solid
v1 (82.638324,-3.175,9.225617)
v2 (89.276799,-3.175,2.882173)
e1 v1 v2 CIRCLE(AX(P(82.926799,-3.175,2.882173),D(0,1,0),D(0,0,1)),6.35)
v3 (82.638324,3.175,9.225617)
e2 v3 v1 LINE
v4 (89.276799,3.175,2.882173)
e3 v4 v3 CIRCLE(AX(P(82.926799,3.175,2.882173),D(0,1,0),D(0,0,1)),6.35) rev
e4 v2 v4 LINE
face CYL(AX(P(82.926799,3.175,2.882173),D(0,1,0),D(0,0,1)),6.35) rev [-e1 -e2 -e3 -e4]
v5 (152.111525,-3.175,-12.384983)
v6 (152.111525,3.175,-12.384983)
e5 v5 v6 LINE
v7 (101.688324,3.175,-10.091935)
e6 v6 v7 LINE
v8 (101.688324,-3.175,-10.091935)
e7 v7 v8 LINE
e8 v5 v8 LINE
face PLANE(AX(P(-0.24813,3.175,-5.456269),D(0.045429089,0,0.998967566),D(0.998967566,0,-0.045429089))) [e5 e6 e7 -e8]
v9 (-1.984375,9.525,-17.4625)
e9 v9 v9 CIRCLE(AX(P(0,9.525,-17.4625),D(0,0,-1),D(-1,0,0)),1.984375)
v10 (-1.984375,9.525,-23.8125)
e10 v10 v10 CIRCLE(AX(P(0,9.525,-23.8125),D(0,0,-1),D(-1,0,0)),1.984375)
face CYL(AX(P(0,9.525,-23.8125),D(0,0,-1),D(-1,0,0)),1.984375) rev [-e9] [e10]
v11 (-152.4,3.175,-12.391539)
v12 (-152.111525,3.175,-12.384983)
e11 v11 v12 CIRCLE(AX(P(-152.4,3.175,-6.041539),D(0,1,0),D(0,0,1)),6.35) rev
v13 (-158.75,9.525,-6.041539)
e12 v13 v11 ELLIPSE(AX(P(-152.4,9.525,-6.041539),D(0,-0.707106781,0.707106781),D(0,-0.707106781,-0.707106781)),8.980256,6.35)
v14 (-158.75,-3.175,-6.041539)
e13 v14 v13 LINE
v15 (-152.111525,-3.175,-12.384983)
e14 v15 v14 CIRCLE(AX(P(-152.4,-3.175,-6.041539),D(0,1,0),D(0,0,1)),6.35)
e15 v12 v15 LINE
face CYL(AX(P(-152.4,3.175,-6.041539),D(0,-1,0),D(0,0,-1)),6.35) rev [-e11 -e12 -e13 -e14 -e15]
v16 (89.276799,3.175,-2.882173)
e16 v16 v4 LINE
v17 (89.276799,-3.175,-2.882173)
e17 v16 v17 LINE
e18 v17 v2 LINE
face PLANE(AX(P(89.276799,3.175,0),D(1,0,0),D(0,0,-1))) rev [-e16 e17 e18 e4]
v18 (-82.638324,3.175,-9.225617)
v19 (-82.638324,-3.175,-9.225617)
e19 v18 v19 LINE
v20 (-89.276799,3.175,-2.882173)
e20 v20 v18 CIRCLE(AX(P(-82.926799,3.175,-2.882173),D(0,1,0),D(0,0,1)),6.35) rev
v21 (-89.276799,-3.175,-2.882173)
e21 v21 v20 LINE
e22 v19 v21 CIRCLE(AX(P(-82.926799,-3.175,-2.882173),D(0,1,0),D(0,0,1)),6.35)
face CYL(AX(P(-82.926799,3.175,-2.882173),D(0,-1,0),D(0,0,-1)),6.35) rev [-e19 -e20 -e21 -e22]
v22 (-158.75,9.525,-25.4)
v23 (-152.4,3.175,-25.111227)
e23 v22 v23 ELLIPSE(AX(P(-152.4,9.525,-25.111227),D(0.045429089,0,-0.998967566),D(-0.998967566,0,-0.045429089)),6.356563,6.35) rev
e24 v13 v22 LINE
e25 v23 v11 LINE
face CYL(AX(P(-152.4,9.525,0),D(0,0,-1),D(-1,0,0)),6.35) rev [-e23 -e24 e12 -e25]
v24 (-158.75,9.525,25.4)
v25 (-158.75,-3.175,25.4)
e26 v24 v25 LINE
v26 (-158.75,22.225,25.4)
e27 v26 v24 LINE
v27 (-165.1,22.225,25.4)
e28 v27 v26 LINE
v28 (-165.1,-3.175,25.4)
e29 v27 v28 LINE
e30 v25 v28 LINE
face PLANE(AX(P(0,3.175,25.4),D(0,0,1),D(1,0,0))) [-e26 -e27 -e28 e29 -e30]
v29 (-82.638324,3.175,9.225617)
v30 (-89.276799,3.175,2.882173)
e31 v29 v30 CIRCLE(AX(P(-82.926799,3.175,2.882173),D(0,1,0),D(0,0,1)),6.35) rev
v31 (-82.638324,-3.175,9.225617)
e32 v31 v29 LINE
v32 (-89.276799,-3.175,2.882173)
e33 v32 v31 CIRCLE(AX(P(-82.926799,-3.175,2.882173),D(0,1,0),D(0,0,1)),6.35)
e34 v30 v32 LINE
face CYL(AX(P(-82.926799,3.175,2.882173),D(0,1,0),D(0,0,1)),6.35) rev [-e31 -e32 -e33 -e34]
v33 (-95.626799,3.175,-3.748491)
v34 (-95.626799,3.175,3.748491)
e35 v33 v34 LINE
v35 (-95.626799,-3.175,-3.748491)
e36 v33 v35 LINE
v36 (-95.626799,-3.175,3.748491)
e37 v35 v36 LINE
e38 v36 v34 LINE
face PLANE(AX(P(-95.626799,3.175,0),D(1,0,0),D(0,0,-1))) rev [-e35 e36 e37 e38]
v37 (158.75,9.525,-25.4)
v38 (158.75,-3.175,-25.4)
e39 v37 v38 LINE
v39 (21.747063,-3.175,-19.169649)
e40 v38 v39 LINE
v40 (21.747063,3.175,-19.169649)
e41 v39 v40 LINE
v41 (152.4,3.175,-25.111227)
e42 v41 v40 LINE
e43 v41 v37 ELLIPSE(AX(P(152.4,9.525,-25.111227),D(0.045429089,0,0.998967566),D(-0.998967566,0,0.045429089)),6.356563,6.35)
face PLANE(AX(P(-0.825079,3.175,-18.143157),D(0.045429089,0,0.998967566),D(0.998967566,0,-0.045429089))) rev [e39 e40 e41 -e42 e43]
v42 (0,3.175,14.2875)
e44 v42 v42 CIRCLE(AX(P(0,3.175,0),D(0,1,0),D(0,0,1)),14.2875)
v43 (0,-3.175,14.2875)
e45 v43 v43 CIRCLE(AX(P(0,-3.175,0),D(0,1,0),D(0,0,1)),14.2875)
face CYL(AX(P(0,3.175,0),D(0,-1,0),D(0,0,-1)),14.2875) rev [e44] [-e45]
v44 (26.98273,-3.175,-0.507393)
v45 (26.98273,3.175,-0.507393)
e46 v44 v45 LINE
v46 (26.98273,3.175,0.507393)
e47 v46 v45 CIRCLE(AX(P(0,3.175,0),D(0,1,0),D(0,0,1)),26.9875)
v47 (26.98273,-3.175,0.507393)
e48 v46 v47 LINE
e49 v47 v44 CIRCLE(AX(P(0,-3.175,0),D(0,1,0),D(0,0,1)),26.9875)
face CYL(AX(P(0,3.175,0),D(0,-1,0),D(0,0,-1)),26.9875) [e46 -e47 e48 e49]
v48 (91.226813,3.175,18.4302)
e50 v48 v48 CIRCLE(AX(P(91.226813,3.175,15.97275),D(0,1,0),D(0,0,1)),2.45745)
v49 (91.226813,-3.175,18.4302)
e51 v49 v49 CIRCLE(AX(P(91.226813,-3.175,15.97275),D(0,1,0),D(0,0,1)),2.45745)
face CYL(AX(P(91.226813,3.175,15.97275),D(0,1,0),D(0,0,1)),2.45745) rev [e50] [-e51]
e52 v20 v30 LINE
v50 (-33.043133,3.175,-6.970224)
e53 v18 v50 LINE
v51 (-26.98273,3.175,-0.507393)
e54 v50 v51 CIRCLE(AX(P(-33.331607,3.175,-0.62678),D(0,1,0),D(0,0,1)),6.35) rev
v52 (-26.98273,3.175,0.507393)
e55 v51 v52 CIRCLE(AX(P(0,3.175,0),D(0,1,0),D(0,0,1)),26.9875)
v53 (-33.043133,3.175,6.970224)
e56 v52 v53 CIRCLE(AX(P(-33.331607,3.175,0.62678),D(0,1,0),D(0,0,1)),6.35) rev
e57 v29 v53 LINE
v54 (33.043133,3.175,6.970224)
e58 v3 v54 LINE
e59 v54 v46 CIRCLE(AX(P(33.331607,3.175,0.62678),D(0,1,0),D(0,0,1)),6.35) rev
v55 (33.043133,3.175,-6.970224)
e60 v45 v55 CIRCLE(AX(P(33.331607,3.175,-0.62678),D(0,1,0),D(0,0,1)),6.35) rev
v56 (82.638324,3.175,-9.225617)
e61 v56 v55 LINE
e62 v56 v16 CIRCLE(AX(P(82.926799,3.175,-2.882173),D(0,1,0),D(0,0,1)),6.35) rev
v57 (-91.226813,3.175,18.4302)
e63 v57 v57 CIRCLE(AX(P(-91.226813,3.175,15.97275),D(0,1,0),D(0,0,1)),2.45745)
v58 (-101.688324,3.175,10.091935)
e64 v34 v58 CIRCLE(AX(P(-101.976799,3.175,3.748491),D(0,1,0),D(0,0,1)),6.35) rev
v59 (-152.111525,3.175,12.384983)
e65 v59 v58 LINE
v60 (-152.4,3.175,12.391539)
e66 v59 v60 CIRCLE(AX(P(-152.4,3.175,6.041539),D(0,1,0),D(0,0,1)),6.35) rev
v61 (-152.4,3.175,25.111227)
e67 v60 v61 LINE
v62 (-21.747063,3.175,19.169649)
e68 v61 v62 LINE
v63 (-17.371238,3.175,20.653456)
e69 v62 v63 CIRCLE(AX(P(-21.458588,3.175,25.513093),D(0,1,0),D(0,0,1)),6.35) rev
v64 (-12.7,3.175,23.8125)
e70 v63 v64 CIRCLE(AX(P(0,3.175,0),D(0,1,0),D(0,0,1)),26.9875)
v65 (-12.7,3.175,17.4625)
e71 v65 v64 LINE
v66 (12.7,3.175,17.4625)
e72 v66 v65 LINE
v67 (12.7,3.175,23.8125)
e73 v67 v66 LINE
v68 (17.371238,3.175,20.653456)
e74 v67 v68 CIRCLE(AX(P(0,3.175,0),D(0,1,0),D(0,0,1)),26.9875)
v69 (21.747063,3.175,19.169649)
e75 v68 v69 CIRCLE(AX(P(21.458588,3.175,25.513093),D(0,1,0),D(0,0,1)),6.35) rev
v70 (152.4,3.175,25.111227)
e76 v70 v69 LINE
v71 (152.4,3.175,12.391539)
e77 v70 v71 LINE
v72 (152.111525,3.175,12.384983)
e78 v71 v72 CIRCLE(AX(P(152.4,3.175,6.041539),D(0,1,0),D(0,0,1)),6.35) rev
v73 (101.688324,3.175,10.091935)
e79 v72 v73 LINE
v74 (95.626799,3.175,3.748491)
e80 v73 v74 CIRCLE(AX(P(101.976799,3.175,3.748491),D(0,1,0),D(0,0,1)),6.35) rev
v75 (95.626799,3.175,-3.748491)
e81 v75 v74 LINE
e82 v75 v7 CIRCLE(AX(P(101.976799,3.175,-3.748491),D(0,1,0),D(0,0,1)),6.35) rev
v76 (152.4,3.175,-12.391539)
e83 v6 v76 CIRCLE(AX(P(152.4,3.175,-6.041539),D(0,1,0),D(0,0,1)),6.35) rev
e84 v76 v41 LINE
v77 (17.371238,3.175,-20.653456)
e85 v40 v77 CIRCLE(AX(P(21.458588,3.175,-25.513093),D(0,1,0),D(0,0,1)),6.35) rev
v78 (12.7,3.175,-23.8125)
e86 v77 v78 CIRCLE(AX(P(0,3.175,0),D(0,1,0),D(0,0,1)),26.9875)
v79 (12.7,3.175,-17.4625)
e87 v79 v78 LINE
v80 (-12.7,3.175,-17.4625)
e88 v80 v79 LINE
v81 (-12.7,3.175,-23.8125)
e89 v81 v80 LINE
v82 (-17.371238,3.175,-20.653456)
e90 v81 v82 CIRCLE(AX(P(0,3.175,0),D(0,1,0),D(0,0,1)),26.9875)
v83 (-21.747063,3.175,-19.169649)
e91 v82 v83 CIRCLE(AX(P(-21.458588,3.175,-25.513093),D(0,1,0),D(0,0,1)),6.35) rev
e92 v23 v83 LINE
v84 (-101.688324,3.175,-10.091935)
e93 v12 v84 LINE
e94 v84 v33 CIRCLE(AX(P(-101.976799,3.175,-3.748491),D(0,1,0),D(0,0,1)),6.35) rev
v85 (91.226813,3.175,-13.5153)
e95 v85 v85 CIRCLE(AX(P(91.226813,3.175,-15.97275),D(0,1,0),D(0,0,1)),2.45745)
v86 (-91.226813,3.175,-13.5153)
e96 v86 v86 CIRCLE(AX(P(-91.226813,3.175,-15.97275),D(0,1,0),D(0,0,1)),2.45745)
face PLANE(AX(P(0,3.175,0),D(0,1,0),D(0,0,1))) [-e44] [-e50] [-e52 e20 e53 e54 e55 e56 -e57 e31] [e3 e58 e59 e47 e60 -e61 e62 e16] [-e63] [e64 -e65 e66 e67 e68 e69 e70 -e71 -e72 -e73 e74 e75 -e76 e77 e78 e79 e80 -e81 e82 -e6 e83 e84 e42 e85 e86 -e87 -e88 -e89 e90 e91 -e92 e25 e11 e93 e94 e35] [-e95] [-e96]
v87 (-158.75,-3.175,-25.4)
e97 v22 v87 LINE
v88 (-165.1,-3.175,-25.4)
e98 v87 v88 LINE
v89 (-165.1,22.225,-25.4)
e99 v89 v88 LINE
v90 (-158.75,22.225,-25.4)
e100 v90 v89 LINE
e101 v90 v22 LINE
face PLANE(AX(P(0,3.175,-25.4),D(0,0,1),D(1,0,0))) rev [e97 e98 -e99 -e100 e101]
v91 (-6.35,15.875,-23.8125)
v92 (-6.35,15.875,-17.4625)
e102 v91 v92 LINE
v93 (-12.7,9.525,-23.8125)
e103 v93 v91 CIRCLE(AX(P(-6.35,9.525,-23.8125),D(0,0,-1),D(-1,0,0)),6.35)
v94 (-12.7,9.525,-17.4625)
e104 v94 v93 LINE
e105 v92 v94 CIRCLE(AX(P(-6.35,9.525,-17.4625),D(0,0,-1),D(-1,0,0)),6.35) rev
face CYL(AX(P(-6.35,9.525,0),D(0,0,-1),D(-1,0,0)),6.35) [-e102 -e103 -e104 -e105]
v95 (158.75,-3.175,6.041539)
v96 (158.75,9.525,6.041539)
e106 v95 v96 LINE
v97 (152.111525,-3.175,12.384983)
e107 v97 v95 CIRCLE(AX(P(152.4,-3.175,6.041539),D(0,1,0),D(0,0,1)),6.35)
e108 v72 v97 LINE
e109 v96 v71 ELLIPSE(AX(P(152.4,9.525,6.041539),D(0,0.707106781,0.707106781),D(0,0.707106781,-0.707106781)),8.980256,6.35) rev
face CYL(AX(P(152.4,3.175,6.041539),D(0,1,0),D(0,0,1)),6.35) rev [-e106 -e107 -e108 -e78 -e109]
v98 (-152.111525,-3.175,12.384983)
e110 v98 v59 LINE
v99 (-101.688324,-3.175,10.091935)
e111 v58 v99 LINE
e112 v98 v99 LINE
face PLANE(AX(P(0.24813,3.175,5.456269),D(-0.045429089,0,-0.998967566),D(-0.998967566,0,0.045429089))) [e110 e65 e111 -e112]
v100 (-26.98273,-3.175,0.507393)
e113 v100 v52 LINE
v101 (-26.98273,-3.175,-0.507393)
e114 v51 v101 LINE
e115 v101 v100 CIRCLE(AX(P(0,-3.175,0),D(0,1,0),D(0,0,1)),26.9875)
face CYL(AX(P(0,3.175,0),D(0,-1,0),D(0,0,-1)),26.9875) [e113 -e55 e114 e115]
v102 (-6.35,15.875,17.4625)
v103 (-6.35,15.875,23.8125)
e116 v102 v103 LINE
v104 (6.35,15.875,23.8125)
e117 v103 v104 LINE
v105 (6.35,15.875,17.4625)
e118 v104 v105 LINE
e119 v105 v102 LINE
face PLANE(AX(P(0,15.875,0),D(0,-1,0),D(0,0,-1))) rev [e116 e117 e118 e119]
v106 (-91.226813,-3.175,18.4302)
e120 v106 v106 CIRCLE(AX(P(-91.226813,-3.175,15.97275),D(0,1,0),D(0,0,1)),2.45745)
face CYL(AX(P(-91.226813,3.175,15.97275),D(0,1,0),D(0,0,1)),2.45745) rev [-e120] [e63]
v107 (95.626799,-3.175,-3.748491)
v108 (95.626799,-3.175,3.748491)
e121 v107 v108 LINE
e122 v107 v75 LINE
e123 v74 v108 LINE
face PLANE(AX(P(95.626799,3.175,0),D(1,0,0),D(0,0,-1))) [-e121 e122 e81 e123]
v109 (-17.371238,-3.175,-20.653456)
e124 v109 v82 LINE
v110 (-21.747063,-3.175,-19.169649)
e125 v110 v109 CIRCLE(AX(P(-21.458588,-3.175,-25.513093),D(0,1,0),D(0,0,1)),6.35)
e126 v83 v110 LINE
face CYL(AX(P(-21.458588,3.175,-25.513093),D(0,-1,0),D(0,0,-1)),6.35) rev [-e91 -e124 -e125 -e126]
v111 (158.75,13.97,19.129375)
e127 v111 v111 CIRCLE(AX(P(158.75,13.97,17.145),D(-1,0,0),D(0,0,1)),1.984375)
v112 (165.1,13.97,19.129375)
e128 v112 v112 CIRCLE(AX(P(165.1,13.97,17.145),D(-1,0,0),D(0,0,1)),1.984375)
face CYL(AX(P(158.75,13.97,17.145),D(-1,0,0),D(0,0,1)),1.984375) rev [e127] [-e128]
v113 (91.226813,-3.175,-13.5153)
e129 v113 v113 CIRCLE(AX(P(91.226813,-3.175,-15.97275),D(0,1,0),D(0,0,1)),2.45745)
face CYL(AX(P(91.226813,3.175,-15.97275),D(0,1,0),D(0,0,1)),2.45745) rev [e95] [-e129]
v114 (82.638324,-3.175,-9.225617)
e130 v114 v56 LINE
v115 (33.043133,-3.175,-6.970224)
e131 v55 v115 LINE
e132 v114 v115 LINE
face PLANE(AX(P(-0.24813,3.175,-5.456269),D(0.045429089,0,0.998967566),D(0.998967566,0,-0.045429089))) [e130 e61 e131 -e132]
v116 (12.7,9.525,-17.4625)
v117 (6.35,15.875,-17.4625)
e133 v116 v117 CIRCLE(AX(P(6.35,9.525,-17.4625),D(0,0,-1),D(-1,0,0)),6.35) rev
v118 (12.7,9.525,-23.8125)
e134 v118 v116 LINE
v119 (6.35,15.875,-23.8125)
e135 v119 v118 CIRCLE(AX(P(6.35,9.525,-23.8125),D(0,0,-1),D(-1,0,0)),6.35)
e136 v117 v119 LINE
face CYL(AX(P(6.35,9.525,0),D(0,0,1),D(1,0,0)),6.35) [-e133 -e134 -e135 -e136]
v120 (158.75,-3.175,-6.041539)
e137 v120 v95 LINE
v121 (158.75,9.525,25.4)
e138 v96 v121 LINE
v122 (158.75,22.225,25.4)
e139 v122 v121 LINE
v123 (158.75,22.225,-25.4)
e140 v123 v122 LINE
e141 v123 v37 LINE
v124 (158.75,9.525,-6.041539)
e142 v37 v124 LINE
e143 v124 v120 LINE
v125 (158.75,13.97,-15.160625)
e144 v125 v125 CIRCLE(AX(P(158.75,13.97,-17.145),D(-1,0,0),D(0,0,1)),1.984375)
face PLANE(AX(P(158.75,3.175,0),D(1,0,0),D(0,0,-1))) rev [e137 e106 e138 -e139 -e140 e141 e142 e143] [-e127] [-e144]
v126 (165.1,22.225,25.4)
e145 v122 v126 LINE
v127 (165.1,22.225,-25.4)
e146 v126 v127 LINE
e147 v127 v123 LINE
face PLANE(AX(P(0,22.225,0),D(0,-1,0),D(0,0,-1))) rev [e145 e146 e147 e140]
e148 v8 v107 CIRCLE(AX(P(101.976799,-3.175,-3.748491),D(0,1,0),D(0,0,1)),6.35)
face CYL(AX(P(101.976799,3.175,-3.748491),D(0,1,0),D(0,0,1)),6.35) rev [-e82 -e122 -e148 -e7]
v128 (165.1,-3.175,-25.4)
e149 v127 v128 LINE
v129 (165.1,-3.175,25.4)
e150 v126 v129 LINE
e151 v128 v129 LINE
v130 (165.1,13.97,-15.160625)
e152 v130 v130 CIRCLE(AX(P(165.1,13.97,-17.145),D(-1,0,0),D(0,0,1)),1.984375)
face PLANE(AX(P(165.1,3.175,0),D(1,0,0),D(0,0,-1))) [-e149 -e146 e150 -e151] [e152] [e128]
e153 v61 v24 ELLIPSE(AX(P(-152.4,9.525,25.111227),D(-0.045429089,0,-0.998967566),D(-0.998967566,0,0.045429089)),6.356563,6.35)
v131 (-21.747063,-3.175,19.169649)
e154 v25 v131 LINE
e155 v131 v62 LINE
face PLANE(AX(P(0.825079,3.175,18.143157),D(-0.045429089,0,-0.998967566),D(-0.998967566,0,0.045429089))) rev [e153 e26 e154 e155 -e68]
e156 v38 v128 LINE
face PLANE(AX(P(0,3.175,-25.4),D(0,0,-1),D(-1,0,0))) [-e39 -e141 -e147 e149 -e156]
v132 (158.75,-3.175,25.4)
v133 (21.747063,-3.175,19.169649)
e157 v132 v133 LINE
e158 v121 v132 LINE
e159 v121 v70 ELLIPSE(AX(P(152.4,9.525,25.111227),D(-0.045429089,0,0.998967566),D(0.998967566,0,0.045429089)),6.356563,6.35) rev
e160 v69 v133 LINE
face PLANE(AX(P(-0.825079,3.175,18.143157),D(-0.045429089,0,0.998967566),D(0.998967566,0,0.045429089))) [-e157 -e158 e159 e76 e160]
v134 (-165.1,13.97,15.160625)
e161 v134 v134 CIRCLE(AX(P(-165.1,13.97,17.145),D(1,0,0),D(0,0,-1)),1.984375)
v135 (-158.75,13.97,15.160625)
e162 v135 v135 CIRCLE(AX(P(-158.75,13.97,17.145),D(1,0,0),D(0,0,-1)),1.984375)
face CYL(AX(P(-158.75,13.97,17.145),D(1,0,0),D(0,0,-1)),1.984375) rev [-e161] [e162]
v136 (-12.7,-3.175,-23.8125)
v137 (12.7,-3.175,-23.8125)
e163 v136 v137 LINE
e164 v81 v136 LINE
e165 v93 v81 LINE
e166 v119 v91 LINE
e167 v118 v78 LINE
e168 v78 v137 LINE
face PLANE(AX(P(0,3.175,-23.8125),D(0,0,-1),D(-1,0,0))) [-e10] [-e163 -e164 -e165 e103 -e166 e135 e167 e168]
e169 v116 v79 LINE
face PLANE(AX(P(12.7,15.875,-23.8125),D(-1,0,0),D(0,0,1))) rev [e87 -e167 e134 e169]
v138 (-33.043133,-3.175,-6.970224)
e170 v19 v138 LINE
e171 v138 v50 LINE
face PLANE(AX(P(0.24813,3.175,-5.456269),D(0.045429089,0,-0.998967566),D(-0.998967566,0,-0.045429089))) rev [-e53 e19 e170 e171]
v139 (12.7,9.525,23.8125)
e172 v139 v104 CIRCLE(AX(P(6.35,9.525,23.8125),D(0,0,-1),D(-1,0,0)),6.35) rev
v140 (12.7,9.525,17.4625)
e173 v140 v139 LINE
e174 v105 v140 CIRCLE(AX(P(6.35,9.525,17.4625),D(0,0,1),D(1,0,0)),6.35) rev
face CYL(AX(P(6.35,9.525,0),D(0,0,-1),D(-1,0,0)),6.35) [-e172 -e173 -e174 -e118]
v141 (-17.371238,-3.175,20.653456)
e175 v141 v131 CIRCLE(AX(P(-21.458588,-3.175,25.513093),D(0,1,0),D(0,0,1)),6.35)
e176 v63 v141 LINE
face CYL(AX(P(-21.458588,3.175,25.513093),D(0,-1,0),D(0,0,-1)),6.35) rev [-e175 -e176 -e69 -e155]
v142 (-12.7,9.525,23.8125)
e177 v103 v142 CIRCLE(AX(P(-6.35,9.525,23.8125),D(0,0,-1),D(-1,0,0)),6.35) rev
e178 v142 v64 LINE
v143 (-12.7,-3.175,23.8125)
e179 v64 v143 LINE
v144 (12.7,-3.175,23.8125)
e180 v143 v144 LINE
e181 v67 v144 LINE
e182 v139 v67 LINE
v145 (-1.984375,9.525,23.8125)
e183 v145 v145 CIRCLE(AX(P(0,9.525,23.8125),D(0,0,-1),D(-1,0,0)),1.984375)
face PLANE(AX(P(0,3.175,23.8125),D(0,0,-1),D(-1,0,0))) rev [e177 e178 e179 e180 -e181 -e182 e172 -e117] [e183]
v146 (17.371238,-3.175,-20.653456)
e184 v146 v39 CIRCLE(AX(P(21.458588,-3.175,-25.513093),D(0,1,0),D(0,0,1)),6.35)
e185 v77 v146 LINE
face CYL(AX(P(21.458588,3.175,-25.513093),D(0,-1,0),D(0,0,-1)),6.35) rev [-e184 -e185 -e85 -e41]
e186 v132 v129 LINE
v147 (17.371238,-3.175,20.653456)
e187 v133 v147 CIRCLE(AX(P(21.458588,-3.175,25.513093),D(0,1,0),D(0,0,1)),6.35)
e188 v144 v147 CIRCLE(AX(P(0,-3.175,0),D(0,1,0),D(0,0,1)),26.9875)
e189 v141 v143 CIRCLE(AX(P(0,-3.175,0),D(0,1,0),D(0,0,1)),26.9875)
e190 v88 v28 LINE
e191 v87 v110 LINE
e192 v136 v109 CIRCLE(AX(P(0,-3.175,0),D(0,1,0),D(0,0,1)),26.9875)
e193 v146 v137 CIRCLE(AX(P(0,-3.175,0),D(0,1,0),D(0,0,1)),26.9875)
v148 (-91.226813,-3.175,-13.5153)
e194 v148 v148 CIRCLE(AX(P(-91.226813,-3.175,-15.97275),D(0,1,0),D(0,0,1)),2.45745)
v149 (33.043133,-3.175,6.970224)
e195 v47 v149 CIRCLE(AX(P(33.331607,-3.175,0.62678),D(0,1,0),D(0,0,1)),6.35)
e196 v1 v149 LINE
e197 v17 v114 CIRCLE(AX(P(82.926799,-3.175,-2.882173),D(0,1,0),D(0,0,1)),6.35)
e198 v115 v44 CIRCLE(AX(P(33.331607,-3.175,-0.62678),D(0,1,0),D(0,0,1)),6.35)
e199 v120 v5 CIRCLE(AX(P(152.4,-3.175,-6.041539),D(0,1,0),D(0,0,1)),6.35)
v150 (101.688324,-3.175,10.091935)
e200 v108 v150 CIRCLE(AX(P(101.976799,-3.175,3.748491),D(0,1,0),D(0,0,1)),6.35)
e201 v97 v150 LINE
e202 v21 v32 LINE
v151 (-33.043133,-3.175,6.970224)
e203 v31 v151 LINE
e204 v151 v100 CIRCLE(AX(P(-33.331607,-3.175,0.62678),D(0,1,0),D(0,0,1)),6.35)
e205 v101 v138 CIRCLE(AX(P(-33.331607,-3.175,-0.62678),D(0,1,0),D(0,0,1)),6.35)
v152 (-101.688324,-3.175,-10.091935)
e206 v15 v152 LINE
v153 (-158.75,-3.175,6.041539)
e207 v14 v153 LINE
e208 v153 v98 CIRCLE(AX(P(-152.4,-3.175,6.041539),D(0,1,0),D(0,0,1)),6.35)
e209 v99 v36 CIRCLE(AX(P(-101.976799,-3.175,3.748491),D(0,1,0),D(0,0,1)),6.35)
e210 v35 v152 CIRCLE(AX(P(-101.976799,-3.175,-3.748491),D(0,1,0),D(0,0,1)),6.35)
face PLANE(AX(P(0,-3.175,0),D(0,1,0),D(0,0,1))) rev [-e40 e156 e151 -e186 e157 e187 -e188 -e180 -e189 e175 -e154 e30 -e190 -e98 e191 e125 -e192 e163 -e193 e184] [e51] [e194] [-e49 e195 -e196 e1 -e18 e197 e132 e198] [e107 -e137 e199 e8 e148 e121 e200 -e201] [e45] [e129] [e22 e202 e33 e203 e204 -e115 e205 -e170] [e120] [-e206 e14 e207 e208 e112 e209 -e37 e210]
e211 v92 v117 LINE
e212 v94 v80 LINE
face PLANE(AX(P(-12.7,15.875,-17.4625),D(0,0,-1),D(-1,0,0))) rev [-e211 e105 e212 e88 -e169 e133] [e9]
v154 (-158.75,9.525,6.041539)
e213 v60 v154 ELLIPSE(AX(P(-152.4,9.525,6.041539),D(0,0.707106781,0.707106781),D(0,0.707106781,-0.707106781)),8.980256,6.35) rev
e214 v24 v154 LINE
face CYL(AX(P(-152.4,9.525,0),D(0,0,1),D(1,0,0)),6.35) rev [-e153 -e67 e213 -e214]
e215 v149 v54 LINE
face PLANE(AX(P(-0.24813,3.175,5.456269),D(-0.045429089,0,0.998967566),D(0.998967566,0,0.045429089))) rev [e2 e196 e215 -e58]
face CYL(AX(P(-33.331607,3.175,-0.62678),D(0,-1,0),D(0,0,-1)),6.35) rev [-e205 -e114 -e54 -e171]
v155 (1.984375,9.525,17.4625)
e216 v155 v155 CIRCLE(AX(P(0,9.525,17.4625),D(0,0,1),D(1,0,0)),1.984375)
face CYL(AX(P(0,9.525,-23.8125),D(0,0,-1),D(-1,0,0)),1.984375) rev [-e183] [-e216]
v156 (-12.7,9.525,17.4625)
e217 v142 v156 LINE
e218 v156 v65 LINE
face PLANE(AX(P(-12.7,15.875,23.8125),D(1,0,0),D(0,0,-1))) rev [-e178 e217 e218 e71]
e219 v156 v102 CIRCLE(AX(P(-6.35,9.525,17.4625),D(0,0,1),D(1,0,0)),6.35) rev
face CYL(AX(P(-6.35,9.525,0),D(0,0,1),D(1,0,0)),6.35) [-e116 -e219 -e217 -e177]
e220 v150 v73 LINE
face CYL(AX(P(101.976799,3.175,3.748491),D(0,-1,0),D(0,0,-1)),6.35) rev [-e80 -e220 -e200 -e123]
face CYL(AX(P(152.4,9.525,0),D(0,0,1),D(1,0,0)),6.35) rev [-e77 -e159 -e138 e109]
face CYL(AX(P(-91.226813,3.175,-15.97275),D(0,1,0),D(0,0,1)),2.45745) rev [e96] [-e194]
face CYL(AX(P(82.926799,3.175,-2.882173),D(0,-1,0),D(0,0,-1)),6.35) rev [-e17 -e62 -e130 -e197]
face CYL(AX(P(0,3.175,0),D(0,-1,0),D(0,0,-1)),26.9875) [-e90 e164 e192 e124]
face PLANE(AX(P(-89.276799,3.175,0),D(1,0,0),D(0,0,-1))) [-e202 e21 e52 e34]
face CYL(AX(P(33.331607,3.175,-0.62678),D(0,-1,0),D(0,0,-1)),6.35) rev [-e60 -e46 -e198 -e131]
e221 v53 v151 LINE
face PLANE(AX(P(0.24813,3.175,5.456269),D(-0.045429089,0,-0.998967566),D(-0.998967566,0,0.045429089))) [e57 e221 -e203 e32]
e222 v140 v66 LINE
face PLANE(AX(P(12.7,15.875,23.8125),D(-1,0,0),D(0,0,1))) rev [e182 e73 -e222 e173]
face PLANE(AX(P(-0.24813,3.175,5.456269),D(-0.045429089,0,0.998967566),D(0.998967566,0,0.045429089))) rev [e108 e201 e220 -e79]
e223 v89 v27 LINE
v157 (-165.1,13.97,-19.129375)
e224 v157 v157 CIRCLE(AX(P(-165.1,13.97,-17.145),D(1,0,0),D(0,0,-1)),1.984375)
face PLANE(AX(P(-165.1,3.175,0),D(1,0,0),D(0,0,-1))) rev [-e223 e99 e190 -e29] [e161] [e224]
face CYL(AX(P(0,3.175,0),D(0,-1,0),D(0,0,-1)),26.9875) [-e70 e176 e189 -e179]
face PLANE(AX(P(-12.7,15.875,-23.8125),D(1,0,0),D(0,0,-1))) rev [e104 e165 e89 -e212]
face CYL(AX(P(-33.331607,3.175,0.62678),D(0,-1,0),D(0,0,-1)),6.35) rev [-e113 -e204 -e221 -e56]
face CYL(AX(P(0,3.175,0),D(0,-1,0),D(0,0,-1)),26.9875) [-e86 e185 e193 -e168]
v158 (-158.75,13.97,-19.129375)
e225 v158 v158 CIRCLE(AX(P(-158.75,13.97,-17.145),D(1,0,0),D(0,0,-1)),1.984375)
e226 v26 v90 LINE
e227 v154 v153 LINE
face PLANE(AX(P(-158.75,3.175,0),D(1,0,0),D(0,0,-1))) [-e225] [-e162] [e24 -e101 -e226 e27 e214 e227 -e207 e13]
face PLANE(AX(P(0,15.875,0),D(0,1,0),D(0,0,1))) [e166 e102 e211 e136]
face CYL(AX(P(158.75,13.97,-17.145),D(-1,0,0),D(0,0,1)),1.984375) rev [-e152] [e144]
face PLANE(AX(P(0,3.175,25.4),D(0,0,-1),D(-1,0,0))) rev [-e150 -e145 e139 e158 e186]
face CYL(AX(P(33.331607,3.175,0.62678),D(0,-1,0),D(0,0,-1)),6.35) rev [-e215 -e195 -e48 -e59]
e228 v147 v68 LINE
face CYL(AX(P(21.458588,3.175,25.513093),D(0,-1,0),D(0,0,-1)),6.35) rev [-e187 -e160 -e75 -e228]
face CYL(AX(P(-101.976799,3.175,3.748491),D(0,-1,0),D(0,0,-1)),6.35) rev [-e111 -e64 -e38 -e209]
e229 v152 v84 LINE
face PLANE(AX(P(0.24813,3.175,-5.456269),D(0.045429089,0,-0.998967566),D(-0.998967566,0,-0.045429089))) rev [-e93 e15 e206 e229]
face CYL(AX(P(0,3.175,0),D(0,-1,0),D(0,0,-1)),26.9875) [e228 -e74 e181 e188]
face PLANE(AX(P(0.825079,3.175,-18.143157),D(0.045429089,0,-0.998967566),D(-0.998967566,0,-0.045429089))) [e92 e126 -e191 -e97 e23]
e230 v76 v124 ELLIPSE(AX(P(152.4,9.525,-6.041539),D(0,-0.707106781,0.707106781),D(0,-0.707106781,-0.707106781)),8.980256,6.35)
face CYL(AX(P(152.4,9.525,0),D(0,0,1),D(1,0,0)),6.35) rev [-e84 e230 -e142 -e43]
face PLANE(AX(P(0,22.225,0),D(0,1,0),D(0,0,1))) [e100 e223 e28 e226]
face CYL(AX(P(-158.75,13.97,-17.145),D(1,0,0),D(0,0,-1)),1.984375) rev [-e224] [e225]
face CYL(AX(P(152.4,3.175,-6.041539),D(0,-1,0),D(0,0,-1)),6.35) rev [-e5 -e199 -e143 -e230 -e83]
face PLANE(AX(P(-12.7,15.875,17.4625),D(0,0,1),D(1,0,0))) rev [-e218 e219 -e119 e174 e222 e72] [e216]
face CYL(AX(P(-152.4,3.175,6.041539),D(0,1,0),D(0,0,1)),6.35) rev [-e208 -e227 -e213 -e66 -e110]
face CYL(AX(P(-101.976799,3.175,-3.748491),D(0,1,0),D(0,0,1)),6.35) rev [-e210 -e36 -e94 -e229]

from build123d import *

# Parameters (mm, degrees)
SKETCH1_R                           = 14.2875
BOSS_EXTRUDE1_DEPTH                 = 3.175
SKETCH2_W                           = 6.35
SKETCH2_H                           = 50.8
BOSS_EXTRUDE2_DEPTH                 = 19.05
SKETCH7_W                           = 25.4
SKETCH7_H                           = 6.35
BOSS_EXTRUDE3_DEPTH                 = 12.7
FILLET1_R                           = 6.35
F_10_0_1935_DIAMETER_HOLE1_D        = 4.9149
F_5_32_0_15625_DIAMETER_HOLE1_D     = 3.96875
F_5_32_0_15625_DIAMETER_HOLE1_DEPTH = 6.35
F_5_32_0_15625_DIAMETER_HOLE2_D     = 3.96875


with BuildPart() as part:
    # Sketch1 → Boss-Extrude1 (new, symmetric)
    with BuildSketch(Plane(origin=(0, 0, 0), x_dir=(1, 0, 0), z_dir=(0, 1, 0))):
        with BuildLine():
            ThreePointArc((-19.116031394, -19.05), (-16.085251474, -21.670021718), (-12.7, -23.8125))
            Line((-12.7, -23.8125), (12.7, -23.8125))
            ThreePointArc((12.7, -23.8125), (16.085251474, -21.670021718), (19.116031394, -19.05))
            Line((19.116031394, -19.05), (158.75, -25.4))
            Line((158.75, -25.4), (165.1, -25.4))
            Line((165.1, -25.4), (165.1, 25.4))
            Line((165.1, 25.4), (158.75, 25.4))
            Line((158.75, 25.4), (19.116031394, 19.05))
            ThreePointArc((19.116031394, 19.05), (16.085251474, 21.670021718), (12.7, 23.8125))
            Line((12.7, 23.8125), (-12.7, 23.8125))
            ThreePointArc((-12.7, 23.8125), (-16.085251474, 21.670021718), (-19.116031394, 19.05))
            Line((-19.116031394, 19.05), (-158.75, 25.4))
            Line((-158.75, 25.4), (-165.1, 25.4))
            Line((-165.1, 25.4), (-165.1, -25.4))
            Line((-165.1, -25.4), (-158.75, -25.4))
            Line((-158.75, -25.4), (-19.116031394, -19.05))
        make_face()
        Polygon((-158.75, 12.686874536), (-95.626798508, 9.816281274), (-95.626798508, -9.816281274), (-158.75, -12.686874536), align=None, mode=Mode.SUBTRACT)
        with BuildLine():
            Line((-89.276798508, 9.527508417), (-26.153597016, 6.656915155))
            ThreePointArc((-26.153597016, 6.656915155), (-26.9875, 0), (-26.153597016, -6.656915155))
            Line((-26.153597016, -6.656915155), (-89.276798508, -9.527508417))
            Line((-89.276798508, -9.527508417), (-89.276798508, 9.527508417))
        make_face(mode=Mode.SUBTRACT)
        with BuildLine():
            ThreePointArc((26.153597016, -6.656915155), (26.9875, 0), (26.153597016, 6.656915155))
            Line((26.153597016, 6.656915155), (89.276798508, 9.527508417))
            Line((89.276798508, 9.527508417), (89.276798508, -9.527508417))
            Line((89.276798508, -9.527508417), (26.153597016, -6.656915155))
        make_face(mode=Mode.SUBTRACT)
        Polygon((95.626798508, -9.816281274), (95.626798508, 9.816281274), (158.75, 12.686874536), (158.75, -12.686874536), align=None, mode=Mode.SUBTRACT)
        with Locations(Location((0, 0, 0), (0, 0, 270))):
            Circle(SKETCH1_R, mode=Mode.SUBTRACT)
    extrude(amount=BOSS_EXTRUDE1_DEPTH, both=True)

    # Sketch2 → Boss-Extrude2 (add)
    with BuildSketch(Plane(origin=(0, 3.175, 0), x_dir=(1, 0, 0), z_dir=(0, 1, 0))):
        with Locations((-161.925, 0)):
            Rectangle(SKETCH2_W, SKETCH2_H)
        with Locations((161.925, 0)):
            Rectangle(SKETCH2_W, SKETCH2_H)
    extrude(amount=BOSS_EXTRUDE2_DEPTH)

    # Sketch7 → Boss-Extrude3 (add)
    with BuildSketch(Plane(origin=(0, 3.175, 0), x_dir=(1, 0, 0), z_dir=(0, 1, 0))):
        with Locations((0, 20.6375)):
            Rectangle(SKETCH7_W, SKETCH7_H)
        with Locations((0, -20.6375)):
            Rectangle(SKETCH7_W, SKETCH7_H)
    extrude(amount=BOSS_EXTRUDE3_DEPTH)

    # Fillet1
    # the kernel refuses this fillet: 6.35 mm, written as the material it adds along each edge
    with BuildSketch(Plane(origin=(-158.75, 3.175, -3.188125464), x_dir=(1, 0, 0), z_dir=(0, 0, 1))) as fillet1_piece_1_section:
        with BuildLine():
            CenterArc((FILLET1_R, FILLET1_R), FILLET1_R, 180, 90)
            Line((0, FILLET1_R), (0, 0))
            Line((0, 0), (FILLET1_R, 0))
        make_face()
    fillet1_piece_1 = extrude(amount=28.588125464, mode=Mode.PRIVATE)
    fillet1_piece_1 = split(fillet1_piece_1, bisect_by=Plane(origin=(-157.023883404, 4.612578558, 25.321503052), z_dir=(-0.04542908940534357, 0, -0.9989675659578751)), keep=Keep.TOP, mode=Mode.PRIVATE)
    fillet1_piece_1 = split(fillet1_piece_1, bisect_by=Plane(origin=(-157.600832839, 4.612578558, 12.634614964), z_dir=(0.04542908940534378, 0, 0.998967565957875)), keep=Keep.TOP, mode=Mode.PRIVATE)
    add(fillet1_piece_1)
    with BuildSketch(Plane(origin=(158.75, 3.175, -25.4), x_dir=(-1, 0, 0), z_dir=(0, 0, 1))) as fillet1_piece_2_section:
        with BuildLine():
            CenterArc((FILLET1_R, -FILLET1_R), FILLET1_R, 90, 90)
            Line((0, -FILLET1_R), (0, 0))
            Line((0, 0), (FILLET1_R, 0))
        make_face()
    fillet1_piece_2 = extrude(amount=28.588125464, mode=Mode.PRIVATE)
    fillet1_piece_2 = split(fillet1_piece_2, bisect_by=Plane(origin=(157.023883404, 4.612578558, -25.321503052), z_dir=(0.04542908940534357, 0, 0.9989675659578751)), keep=Keep.TOP, mode=Mode.PRIVATE)
    fillet1_piece_2 = split(fillet1_piece_2, bisect_by=Plane(origin=(157.600832839, 4.612578558, -12.634614964), z_dir=(-0.04542908940534328, 0, -0.9989675659578751)), keep=Keep.TOP, mode=Mode.PRIVATE)
    add(fillet1_piece_2)
    with BuildSketch(Plane(origin=(158.75, 3.175, -3.188125464), x_dir=(-1, 0, 0), z_dir=(0, 0, 1))) as fillet1_piece_3_section:
        with BuildLine():
            CenterArc((FILLET1_R, -FILLET1_R), FILLET1_R, 90, 90)
            Line((0, -FILLET1_R), (0, 0))
            Line((0, 0), (FILLET1_R, 0))
        make_face()
    fillet1_piece_3 = extrude(amount=28.588125464, mode=Mode.PRIVATE)
    fillet1_piece_3 = split(fillet1_piece_3, bisect_by=Plane(origin=(157.600832839, 4.612578558, 12.634614964), z_dir=(-0.04542908940534378, 0, 0.998967565957875)), keep=Keep.TOP, mode=Mode.PRIVATE)
    fillet1_piece_3 = split(fillet1_piece_3, bisect_by=Plane(origin=(157.023883404, 4.612578558, 25.321503052), z_dir=(0.04542908940534357, 0, -0.9989675659578751)), keep=Keep.TOP, mode=Mode.PRIVATE)
    add(fillet1_piece_3)
    with BuildSketch(Plane(origin=(-95.626798508, -3.175, 9.816281274), x_dir=(0, 0, -1), z_dir=(0, 1, 0)), Plane(origin=(-95.626798508, -3.175, -9.816281274), x_dir=(-0.998967565957875, 0, -0.04542908940534381), z_dir=(0, 1, 0)), Plane(origin=(95.626798508, -3.175, -9.816281274), x_dir=(0, 0, 1), z_dir=(0, 1, 0)), Plane(origin=(95.626798508, -3.175, 9.816281274), x_dir=(0.998967565957875, 0, 0.045429089405343306), z_dir=(0, 1, 0))) as fillet1_piece_4:
        with BuildLine():
            CenterArc((FILLET1_R * 0.955557460646, FILLET1_R), FILLET1_R, 182.603791233, 87.396208767)
            Line((-FILLET1_R * 0.0434101053116, FILLET1_R * 0.954570910595), (0, 0))
            Line((0, 0), (FILLET1_R * 0.955557460646, 0))
        make_face()
    extrude(amount=6.35)
    with BuildSketch(Plane(origin=(-158.75, -3.175, -12.686874536), x_dir=(0, 0, 1), z_dir=(0, 1, 0)), Plane(origin=(-158.75, 3.175, 12.686874536), x_dir=(0, 0, -1), z_dir=(0, -1, 0)), Plane(origin=(-89.276798508, 3.175, -9.527508417), x_dir=(0.9989675659578751, 0, 0.04542908940534214), z_dir=(0, -1, 0)), Plane(origin=(-89.276798508, -3.175, 9.527508417), x_dir=(0.998967565957875, 0, -0.045429089405344805), z_dir=(0, 1, 0)), Plane(origin=(158.75, 3.175, 12.686874536), x_dir=(-0.9989675659578751, 0, -0.04542908940534367), z_dir=(0, -1, 0)), Plane(origin=(158.75, -3.175, -12.686874536), x_dir=(-0.9989675659578751, 0, 0.04542908940534313), z_dir=(0, 1, 0)), Plane(origin=(89.276798508, -3.175, 9.527508417), x_dir=(0, 0, -1), z_dir=(0, 1, 0)), Plane(origin=(89.276798508, 3.175, -9.527508417), x_dir=(0, 0, 1), z_dir=(0, -1, 0))) as fillet1_piece_5:
        with BuildLine():
            CenterArc((FILLET1_R * 1.04650954148, FILLET1_R), FILLET1_R, 177.396208767, 92.603791233)
            Line((FILLET1_R * 0.0475419755235, FILLET1_R * 1.04542908941), (0, 0))
            Line((0, 0), (FILLET1_R * 1.04650954148, 0))
        make_face()
    extrude(amount=6.35)
    with BuildSketch(Plane(origin=(-26.153597016, -3.175, -6.656915155), x_dir=(-0.998967565957875, 0, -0.04542908940534309), z_dir=(0, 1, 0)), Plane(origin=(26.153597016, -3.175, 6.656915155), x_dir=(0.998967565957875, 0, 0.04542908940534391), z_dir=(0, 1, 0))) as fillet1_piece_6:
        with BuildLine():
            CenterArc((6.896656029, 6.35), FILLET1_R, 181.526507099, 88.473492901)
            ThreePointArc((0.548909595, 6.180839663), (0.452688718, 3.074591188), (0, 0))
            Line((0, 0), (6.896656029, 0))
        make_face()
    extrude(amount=6.35)
    with BuildSketch(Plane(origin=(-26.153597016, -3.175, 6.656915155), x_dir=(-0.13361976900792855, 0, -0.9910326721810275), z_dir=(0, 1, 0)), Plane(origin=(26.153597016, -3.175, -6.656915155), x_dir=(0.13361976900792732, 0, 0.9910326721810275), z_dir=(0, 1, 0))) as fillet1_piece_7:
        with BuildLine():
            CenterArc((6.935185133, 6.307897554), FILLET1_R, 174.92497584, 88.473492901)
            Line((0.610078906, 6.869619211), (0, 0))
            ThreePointArc((0, 0), (3.102582823, 0.178935397), (6.205165645, 0))
        make_face()
    extrude(amount=6.35)
    with BuildSketch(Plane(origin=(-19.116031394, 3.175, -19.05), x_dir=(-0.9989675659578751, 0, -0.0454290894053416), z_dir=(0, -1, 0)), Plane(origin=(19.116031394, -3.175, -19.05), x_dir=(0.9989675659578751, 0, -0.04542908940534203), z_dir=(0, 1, 0)), Plane(origin=(-19.116031394, -3.175, 19.05), x_dir=(-0.9989675659578751, 0, 0.04542908940534209), z_dir=(0, 1, 0))) as fillet1_piece_8:
        with BuildLine():
            CenterArc((2.633750418, 6.35), FILLET1_R, 227.329641643, 42.670358357)
            ThreePointArc((-1.670148615, 1.681065099), (-0.816614348, 0.858872634), (0, 0))
            Line((0, 0), (2.633750418, 0))
        make_face()
    extrude(amount=6.35)
    with BuildSketch(Plane(origin=(19.116031394, -3.175, 19.05), x_dir=(-0.736299689051418, 0, 0.6766555755351352), z_dir=(0, 1, 0))) as fillet1_piece_9:
        with BuildLine():
            CenterArc((2.648464222, 6.343877247), FILLET1_R, 224.813361283, 42.670358357)
            Line((-1.856266403, 1.868399396), (0, 0))
            ThreePointArc((0, 0), (1.184839257, 0.026021699), (2.369678514, 0))
        make_face()
    extrude(amount=6.35)
    with BuildSketch(Plane(origin=(-158.75, 3.175, -25.4), x_dir=(1, 0, 0), z_dir=(0, 0, 1))) as fillet1_piece_10_section:
        with BuildLine():
            CenterArc((FILLET1_R, FILLET1_R), FILLET1_R, 180, 90)
            Line((0, FILLET1_R), (0, 0))
            Line((0, 0), (FILLET1_R, 0))
        make_face()
    fillet1_piece_10 = extrude(amount=28.588125464, mode=Mode.PRIVATE)
    fillet1_piece_10 = split(fillet1_piece_10, bisect_by=Plane(origin=(-157.023883404, 4.612578558, -25.321503052), z_dir=(-0.04542908940534357, 0, 0.9989675659578751)), keep=Keep.TOP, mode=Mode.PRIVATE)
    fillet1_piece_10 = split(fillet1_piece_10, bisect_by=Plane(origin=(-157.600832839, 4.612578558, -12.634614964), z_dir=(0.04542908940534328, 0, -0.9989675659578751)), keep=Keep.TOP, mode=Mode.PRIVATE)
    add(fillet1_piece_10)
    with BuildSketch(Plane(origin=(-158.75, 3.175, -3.188125464), x_dir=(1, 0, 0), z_dir=(0, 0, 1))) as fillet1_piece_11a_section:
        with BuildLine():
            CenterArc((FILLET1_R, FILLET1_R), FILLET1_R, 180, 90)
            Line((0, FILLET1_R), (0, 0))
            Line((0, 0), (FILLET1_R, 0))
        make_face()
    fillet1_piece_11a = extrude(amount=28.588125464, mode=Mode.PRIVATE)
    fillet1_piece_11a = split(fillet1_piece_11a, bisect_by=Plane(origin=(-156.9590385, 4.615793592, 12.605428699), z_dir=(-0.04542908940534378, 0, -0.998967565957875)), keep=Keep.TOP, mode=Mode.PRIVATE)
    with BuildSketch(Plane(origin=(-158.75, 19.788338971, 12.686874536), x_dir=(0, 0, -1), z_dir=(0, -1, 0))) as fillet1_piece_11b_section:
        with BuildLine():
            CenterArc((FILLET1_R * 1.04650954148, FILLET1_R), FILLET1_R, 177.396208767, 92.603791233)
            Line((FILLET1_R * 0.0475419755235, FILLET1_R * 1.04542908941), (0, 0))
            Line((0, 0), (FILLET1_R * 1.04650954148, 0))
        make_face()
    fillet1_piece_11b = extrude(amount=22.963338971, mode=Mode.PRIVATE)
    fillet1_piece_11b = split(fillet1_piece_11b, bisect_by=Plane(origin=(-157.239045955, 3.175, 11.105646711), z_dir=(0, 1, 0)), keep=Keep.TOP, mode=Mode.PRIVATE)
    fillet1_piece_11 = fillet1_piece_11a & fillet1_piece_11b
    add(fillet1_piece_11)
    with BuildSketch(Plane(origin=(158.75, 3.175, -25.4), x_dir=(-1, 0, 0), z_dir=(0, 0, 1))) as fillet1_piece_12a_section:
        with BuildLine():
            CenterArc((FILLET1_R, -FILLET1_R), FILLET1_R, 90, 90)
            Line((0, -FILLET1_R), (0, 0))
            Line((0, 0), (FILLET1_R, 0))
        make_face()
    fillet1_piece_12a = extrude(amount=28.588125464, mode=Mode.PRIVATE)
    fillet1_piece_12a = split(fillet1_piece_12a, bisect_by=Plane(origin=(156.9590385, 4.615793592, -12.605428699), z_dir=(0.04542908940534328, 0, 0.9989675659578751)), keep=Keep.TOP, mode=Mode.PRIVATE)
    with BuildSketch(Plane(origin=(158.75, -3.175, -12.686874536), x_dir=(-0.9989675659578751, 0, 0.04542908940534313), z_dir=(0, 1, 0))) as fillet1_piece_12b_section:
        with BuildLine():
            CenterArc((FILLET1_R * 1.04650954148, FILLET1_R), FILLET1_R, 177.396208767, 92.603791233)
            Line((FILLET1_R * 0.0475419755235, FILLET1_R * 1.04542908941), (0, 0))
            Line((0, 0), (FILLET1_R * 1.04650954148, 0))
        make_face()
    fillet1_piece_12b = extrude(amount=22.963338971, mode=Mode.PRIVATE)
    fillet1_piece_12b = split(fillet1_piece_12b, bisect_by=Plane(origin=(157.239045955, 3.175, -11.105646711), z_dir=(0, 1, 0)), keep=Keep.TOP, mode=Mode.PRIVATE)
    fillet1_piece_12 = fillet1_piece_12a & fillet1_piece_12b
    add(fillet1_piece_12)
    with BuildSketch(Plane(origin=(158.75, 3.175, -3.188125464), x_dir=(-1, 0, 0), z_dir=(0, 0, 1))) as fillet1_piece_13a_section:
        with BuildLine():
            CenterArc((FILLET1_R, -FILLET1_R), FILLET1_R, 90, 90)
            Line((0, -FILLET1_R), (0, 0))
            Line((0, 0), (FILLET1_R, 0))
        make_face()
    fillet1_piece_13a = extrude(amount=28.588125464, mode=Mode.PRIVATE)
    fillet1_piece_13a = split(fillet1_piece_13a, bisect_by=Plane(origin=(156.9590385, 4.615793592, 12.605428699), z_dir=(0.04542908940534378, 0, -0.998967565957875)), keep=Keep.TOP, mode=Mode.PRIVATE)
    with BuildSketch(Plane(origin=(158.75, 19.788338971, 12.686874536), x_dir=(-0.998967565957875, 0, -0.04542908940534393), z_dir=(0, -1, 0))) as fillet1_piece_13b_section:
        with BuildLine():
            CenterArc((FILLET1_R * 1.04650954148, FILLET1_R), FILLET1_R, 177.396208767, 92.603791233)
            Line((FILLET1_R * 0.0475419755235, FILLET1_R * 1.04542908941), (0, 0))
            Line((0, 0), (FILLET1_R * 1.04650954148, 0))
        make_face()
    fillet1_piece_13b = extrude(amount=22.963338971, mode=Mode.PRIVATE)
    fillet1_piece_13b = split(fillet1_piece_13b, bisect_by=Plane(origin=(157.239045955, 3.175, 11.105646711), z_dir=(0, 1, 0)), keep=Keep.TOP, mode=Mode.PRIVATE)
    fillet1_piece_13 = fillet1_piece_13a & fillet1_piece_13b
    add(fillet1_piece_13)
    with BuildSketch(Plane(origin=(-158.75, 3.175, -25.4), x_dir=(1, 0, 0), z_dir=(0, 0, 1))) as fillet1_piece_14a_section:
        with BuildLine():
            CenterArc((FILLET1_R, FILLET1_R), FILLET1_R, 180, 90)
            Line((0, FILLET1_R), (0, 0))
            Line((0, 0), (FILLET1_R, 0))
        make_face()
    fillet1_piece_14a = extrude(amount=28.588125464, mode=Mode.PRIVATE)
    fillet1_piece_14a = split(fillet1_piece_14a, bisect_by=Plane(origin=(-156.9590385, 4.615793592, -12.605428699), z_dir=(-0.04542908940534328, 0, 0.9989675659578751)), keep=Keep.TOP, mode=Mode.PRIVATE)
    with BuildSketch(Plane(origin=(-158.75, -3.175, -12.686874536), x_dir=(0, 0, 1), z_dir=(0, 1, 0))) as fillet1_piece_14b_section:
        with BuildLine():
            CenterArc((FILLET1_R * 1.04650954148, FILLET1_R), FILLET1_R, 177.396208767, 92.603791233)
            Line((FILLET1_R * 0.0475419755235, FILLET1_R * 1.04542908941), (0, 0))
            Line((0, 0), (FILLET1_R * 1.04650954148, 0))
        make_face()
    fillet1_piece_14b = extrude(amount=22.963338971, mode=Mode.PRIVATE)
    fillet1_piece_14b = split(fillet1_piece_14b, bisect_by=Plane(origin=(-157.239045955, 3.175, -11.105646711), z_dir=(0, 1, 0)), keep=Keep.TOP, mode=Mode.PRIVATE)
    fillet1_piece_14 = fillet1_piece_14a & fillet1_piece_14b
    add(fillet1_piece_14)
    # the kernel refuses this fillet: 6.35 mm, written as the material it takes off along each edge
    with BuildSketch(Plane(origin=(-12.7, 15.875, -1.5875), x_dir=(1, 0, 0), z_dir=(0, 0, -1))) as fillet1_2_piece_1:
        with BuildLine():
            CenterArc((FILLET1_R, FILLET1_R), FILLET1_R, 180, 90)
            Line((0, FILLET1_R), (0, 0))
            Line((0, 0), (FILLET1_R, 0))
        make_face()
    extrude(amount=38.1, mode=Mode.SUBTRACT)
    with BuildSketch(Plane(origin=(12.7, 15.875, -39.6875), x_dir=(0, -1, 0), z_dir=(0, 0, 1)), Plane(origin=(-12.7, 15.875, 1.5875), x_dir=(1, 0, 0), z_dir=(0, 0, 1)), Plane(origin=(12.7, 15.875, 39.6875), x_dir=(-1, 0, 0), z_dir=(0, 0, -1))) as fillet1_2_piece_2:
        with BuildLine():
            CenterArc((FILLET1_R, -FILLET1_R), FILLET1_R, 90, 90)
            Line((0, -FILLET1_R), (0, 0))
            Line((0, 0), (FILLET1_R, 0))
        make_face()
    extrude(amount=38.1, mode=Mode.SUBTRACT)

    # #10 (0.1935) Diameter Hole1 (through all)
    with Locations(Plane(origin=(0, 3.175, 0), x_dir=(1, 0, 0), z_dir=(0, 1, 0))):
        with Locations((-91.226813447, 15.972750107), (-91.226813447, -15.972750107), (91.226813447, 15.972750107), (91.226813447, -15.972750107)):
            Hole(F_10_0_1935_DIAMETER_HOLE1_D / 2)

    # 5/32 (0.15625) Diameter Hole1
    with Locations(Plane(origin=(-158.75, 0, 0), x_dir=(0, 0, -1), z_dir=(1, 0, 0))):
        with Locations((17.145, 13.97), (-17.145, 13.97)):
            f_5_32_0_15625_diameter_hole1 = Hole(F_5_32_0_15625_DIAMETER_HOLE1_D / 2, depth=F_5_32_0_15625_DIAMETER_HOLE1_DEPTH)

    # Mirror1: 5/32 (0.15625) Diameter Hole1 across plane
    add(f_5_32_0_15625_diameter_hole1.mirror(Plane(origin=(0, 0, 0), x_dir=(0, 0, 1), z_dir=(1, 0, 0))), mode=Mode.SUBTRACT)

    # 5/32 (0.15625) Diameter Hole2 (through all)
    with Locations(Plane(origin=(0, 0, -23.8125), x_dir=(-1, 0, 0), z_dir=(0, 0, -1))):
        with Locations((0, 9.525)):
            Hole(F_5_32_0_15625_DIAMETER_HOLE2_D / 2)


solid = part.part
